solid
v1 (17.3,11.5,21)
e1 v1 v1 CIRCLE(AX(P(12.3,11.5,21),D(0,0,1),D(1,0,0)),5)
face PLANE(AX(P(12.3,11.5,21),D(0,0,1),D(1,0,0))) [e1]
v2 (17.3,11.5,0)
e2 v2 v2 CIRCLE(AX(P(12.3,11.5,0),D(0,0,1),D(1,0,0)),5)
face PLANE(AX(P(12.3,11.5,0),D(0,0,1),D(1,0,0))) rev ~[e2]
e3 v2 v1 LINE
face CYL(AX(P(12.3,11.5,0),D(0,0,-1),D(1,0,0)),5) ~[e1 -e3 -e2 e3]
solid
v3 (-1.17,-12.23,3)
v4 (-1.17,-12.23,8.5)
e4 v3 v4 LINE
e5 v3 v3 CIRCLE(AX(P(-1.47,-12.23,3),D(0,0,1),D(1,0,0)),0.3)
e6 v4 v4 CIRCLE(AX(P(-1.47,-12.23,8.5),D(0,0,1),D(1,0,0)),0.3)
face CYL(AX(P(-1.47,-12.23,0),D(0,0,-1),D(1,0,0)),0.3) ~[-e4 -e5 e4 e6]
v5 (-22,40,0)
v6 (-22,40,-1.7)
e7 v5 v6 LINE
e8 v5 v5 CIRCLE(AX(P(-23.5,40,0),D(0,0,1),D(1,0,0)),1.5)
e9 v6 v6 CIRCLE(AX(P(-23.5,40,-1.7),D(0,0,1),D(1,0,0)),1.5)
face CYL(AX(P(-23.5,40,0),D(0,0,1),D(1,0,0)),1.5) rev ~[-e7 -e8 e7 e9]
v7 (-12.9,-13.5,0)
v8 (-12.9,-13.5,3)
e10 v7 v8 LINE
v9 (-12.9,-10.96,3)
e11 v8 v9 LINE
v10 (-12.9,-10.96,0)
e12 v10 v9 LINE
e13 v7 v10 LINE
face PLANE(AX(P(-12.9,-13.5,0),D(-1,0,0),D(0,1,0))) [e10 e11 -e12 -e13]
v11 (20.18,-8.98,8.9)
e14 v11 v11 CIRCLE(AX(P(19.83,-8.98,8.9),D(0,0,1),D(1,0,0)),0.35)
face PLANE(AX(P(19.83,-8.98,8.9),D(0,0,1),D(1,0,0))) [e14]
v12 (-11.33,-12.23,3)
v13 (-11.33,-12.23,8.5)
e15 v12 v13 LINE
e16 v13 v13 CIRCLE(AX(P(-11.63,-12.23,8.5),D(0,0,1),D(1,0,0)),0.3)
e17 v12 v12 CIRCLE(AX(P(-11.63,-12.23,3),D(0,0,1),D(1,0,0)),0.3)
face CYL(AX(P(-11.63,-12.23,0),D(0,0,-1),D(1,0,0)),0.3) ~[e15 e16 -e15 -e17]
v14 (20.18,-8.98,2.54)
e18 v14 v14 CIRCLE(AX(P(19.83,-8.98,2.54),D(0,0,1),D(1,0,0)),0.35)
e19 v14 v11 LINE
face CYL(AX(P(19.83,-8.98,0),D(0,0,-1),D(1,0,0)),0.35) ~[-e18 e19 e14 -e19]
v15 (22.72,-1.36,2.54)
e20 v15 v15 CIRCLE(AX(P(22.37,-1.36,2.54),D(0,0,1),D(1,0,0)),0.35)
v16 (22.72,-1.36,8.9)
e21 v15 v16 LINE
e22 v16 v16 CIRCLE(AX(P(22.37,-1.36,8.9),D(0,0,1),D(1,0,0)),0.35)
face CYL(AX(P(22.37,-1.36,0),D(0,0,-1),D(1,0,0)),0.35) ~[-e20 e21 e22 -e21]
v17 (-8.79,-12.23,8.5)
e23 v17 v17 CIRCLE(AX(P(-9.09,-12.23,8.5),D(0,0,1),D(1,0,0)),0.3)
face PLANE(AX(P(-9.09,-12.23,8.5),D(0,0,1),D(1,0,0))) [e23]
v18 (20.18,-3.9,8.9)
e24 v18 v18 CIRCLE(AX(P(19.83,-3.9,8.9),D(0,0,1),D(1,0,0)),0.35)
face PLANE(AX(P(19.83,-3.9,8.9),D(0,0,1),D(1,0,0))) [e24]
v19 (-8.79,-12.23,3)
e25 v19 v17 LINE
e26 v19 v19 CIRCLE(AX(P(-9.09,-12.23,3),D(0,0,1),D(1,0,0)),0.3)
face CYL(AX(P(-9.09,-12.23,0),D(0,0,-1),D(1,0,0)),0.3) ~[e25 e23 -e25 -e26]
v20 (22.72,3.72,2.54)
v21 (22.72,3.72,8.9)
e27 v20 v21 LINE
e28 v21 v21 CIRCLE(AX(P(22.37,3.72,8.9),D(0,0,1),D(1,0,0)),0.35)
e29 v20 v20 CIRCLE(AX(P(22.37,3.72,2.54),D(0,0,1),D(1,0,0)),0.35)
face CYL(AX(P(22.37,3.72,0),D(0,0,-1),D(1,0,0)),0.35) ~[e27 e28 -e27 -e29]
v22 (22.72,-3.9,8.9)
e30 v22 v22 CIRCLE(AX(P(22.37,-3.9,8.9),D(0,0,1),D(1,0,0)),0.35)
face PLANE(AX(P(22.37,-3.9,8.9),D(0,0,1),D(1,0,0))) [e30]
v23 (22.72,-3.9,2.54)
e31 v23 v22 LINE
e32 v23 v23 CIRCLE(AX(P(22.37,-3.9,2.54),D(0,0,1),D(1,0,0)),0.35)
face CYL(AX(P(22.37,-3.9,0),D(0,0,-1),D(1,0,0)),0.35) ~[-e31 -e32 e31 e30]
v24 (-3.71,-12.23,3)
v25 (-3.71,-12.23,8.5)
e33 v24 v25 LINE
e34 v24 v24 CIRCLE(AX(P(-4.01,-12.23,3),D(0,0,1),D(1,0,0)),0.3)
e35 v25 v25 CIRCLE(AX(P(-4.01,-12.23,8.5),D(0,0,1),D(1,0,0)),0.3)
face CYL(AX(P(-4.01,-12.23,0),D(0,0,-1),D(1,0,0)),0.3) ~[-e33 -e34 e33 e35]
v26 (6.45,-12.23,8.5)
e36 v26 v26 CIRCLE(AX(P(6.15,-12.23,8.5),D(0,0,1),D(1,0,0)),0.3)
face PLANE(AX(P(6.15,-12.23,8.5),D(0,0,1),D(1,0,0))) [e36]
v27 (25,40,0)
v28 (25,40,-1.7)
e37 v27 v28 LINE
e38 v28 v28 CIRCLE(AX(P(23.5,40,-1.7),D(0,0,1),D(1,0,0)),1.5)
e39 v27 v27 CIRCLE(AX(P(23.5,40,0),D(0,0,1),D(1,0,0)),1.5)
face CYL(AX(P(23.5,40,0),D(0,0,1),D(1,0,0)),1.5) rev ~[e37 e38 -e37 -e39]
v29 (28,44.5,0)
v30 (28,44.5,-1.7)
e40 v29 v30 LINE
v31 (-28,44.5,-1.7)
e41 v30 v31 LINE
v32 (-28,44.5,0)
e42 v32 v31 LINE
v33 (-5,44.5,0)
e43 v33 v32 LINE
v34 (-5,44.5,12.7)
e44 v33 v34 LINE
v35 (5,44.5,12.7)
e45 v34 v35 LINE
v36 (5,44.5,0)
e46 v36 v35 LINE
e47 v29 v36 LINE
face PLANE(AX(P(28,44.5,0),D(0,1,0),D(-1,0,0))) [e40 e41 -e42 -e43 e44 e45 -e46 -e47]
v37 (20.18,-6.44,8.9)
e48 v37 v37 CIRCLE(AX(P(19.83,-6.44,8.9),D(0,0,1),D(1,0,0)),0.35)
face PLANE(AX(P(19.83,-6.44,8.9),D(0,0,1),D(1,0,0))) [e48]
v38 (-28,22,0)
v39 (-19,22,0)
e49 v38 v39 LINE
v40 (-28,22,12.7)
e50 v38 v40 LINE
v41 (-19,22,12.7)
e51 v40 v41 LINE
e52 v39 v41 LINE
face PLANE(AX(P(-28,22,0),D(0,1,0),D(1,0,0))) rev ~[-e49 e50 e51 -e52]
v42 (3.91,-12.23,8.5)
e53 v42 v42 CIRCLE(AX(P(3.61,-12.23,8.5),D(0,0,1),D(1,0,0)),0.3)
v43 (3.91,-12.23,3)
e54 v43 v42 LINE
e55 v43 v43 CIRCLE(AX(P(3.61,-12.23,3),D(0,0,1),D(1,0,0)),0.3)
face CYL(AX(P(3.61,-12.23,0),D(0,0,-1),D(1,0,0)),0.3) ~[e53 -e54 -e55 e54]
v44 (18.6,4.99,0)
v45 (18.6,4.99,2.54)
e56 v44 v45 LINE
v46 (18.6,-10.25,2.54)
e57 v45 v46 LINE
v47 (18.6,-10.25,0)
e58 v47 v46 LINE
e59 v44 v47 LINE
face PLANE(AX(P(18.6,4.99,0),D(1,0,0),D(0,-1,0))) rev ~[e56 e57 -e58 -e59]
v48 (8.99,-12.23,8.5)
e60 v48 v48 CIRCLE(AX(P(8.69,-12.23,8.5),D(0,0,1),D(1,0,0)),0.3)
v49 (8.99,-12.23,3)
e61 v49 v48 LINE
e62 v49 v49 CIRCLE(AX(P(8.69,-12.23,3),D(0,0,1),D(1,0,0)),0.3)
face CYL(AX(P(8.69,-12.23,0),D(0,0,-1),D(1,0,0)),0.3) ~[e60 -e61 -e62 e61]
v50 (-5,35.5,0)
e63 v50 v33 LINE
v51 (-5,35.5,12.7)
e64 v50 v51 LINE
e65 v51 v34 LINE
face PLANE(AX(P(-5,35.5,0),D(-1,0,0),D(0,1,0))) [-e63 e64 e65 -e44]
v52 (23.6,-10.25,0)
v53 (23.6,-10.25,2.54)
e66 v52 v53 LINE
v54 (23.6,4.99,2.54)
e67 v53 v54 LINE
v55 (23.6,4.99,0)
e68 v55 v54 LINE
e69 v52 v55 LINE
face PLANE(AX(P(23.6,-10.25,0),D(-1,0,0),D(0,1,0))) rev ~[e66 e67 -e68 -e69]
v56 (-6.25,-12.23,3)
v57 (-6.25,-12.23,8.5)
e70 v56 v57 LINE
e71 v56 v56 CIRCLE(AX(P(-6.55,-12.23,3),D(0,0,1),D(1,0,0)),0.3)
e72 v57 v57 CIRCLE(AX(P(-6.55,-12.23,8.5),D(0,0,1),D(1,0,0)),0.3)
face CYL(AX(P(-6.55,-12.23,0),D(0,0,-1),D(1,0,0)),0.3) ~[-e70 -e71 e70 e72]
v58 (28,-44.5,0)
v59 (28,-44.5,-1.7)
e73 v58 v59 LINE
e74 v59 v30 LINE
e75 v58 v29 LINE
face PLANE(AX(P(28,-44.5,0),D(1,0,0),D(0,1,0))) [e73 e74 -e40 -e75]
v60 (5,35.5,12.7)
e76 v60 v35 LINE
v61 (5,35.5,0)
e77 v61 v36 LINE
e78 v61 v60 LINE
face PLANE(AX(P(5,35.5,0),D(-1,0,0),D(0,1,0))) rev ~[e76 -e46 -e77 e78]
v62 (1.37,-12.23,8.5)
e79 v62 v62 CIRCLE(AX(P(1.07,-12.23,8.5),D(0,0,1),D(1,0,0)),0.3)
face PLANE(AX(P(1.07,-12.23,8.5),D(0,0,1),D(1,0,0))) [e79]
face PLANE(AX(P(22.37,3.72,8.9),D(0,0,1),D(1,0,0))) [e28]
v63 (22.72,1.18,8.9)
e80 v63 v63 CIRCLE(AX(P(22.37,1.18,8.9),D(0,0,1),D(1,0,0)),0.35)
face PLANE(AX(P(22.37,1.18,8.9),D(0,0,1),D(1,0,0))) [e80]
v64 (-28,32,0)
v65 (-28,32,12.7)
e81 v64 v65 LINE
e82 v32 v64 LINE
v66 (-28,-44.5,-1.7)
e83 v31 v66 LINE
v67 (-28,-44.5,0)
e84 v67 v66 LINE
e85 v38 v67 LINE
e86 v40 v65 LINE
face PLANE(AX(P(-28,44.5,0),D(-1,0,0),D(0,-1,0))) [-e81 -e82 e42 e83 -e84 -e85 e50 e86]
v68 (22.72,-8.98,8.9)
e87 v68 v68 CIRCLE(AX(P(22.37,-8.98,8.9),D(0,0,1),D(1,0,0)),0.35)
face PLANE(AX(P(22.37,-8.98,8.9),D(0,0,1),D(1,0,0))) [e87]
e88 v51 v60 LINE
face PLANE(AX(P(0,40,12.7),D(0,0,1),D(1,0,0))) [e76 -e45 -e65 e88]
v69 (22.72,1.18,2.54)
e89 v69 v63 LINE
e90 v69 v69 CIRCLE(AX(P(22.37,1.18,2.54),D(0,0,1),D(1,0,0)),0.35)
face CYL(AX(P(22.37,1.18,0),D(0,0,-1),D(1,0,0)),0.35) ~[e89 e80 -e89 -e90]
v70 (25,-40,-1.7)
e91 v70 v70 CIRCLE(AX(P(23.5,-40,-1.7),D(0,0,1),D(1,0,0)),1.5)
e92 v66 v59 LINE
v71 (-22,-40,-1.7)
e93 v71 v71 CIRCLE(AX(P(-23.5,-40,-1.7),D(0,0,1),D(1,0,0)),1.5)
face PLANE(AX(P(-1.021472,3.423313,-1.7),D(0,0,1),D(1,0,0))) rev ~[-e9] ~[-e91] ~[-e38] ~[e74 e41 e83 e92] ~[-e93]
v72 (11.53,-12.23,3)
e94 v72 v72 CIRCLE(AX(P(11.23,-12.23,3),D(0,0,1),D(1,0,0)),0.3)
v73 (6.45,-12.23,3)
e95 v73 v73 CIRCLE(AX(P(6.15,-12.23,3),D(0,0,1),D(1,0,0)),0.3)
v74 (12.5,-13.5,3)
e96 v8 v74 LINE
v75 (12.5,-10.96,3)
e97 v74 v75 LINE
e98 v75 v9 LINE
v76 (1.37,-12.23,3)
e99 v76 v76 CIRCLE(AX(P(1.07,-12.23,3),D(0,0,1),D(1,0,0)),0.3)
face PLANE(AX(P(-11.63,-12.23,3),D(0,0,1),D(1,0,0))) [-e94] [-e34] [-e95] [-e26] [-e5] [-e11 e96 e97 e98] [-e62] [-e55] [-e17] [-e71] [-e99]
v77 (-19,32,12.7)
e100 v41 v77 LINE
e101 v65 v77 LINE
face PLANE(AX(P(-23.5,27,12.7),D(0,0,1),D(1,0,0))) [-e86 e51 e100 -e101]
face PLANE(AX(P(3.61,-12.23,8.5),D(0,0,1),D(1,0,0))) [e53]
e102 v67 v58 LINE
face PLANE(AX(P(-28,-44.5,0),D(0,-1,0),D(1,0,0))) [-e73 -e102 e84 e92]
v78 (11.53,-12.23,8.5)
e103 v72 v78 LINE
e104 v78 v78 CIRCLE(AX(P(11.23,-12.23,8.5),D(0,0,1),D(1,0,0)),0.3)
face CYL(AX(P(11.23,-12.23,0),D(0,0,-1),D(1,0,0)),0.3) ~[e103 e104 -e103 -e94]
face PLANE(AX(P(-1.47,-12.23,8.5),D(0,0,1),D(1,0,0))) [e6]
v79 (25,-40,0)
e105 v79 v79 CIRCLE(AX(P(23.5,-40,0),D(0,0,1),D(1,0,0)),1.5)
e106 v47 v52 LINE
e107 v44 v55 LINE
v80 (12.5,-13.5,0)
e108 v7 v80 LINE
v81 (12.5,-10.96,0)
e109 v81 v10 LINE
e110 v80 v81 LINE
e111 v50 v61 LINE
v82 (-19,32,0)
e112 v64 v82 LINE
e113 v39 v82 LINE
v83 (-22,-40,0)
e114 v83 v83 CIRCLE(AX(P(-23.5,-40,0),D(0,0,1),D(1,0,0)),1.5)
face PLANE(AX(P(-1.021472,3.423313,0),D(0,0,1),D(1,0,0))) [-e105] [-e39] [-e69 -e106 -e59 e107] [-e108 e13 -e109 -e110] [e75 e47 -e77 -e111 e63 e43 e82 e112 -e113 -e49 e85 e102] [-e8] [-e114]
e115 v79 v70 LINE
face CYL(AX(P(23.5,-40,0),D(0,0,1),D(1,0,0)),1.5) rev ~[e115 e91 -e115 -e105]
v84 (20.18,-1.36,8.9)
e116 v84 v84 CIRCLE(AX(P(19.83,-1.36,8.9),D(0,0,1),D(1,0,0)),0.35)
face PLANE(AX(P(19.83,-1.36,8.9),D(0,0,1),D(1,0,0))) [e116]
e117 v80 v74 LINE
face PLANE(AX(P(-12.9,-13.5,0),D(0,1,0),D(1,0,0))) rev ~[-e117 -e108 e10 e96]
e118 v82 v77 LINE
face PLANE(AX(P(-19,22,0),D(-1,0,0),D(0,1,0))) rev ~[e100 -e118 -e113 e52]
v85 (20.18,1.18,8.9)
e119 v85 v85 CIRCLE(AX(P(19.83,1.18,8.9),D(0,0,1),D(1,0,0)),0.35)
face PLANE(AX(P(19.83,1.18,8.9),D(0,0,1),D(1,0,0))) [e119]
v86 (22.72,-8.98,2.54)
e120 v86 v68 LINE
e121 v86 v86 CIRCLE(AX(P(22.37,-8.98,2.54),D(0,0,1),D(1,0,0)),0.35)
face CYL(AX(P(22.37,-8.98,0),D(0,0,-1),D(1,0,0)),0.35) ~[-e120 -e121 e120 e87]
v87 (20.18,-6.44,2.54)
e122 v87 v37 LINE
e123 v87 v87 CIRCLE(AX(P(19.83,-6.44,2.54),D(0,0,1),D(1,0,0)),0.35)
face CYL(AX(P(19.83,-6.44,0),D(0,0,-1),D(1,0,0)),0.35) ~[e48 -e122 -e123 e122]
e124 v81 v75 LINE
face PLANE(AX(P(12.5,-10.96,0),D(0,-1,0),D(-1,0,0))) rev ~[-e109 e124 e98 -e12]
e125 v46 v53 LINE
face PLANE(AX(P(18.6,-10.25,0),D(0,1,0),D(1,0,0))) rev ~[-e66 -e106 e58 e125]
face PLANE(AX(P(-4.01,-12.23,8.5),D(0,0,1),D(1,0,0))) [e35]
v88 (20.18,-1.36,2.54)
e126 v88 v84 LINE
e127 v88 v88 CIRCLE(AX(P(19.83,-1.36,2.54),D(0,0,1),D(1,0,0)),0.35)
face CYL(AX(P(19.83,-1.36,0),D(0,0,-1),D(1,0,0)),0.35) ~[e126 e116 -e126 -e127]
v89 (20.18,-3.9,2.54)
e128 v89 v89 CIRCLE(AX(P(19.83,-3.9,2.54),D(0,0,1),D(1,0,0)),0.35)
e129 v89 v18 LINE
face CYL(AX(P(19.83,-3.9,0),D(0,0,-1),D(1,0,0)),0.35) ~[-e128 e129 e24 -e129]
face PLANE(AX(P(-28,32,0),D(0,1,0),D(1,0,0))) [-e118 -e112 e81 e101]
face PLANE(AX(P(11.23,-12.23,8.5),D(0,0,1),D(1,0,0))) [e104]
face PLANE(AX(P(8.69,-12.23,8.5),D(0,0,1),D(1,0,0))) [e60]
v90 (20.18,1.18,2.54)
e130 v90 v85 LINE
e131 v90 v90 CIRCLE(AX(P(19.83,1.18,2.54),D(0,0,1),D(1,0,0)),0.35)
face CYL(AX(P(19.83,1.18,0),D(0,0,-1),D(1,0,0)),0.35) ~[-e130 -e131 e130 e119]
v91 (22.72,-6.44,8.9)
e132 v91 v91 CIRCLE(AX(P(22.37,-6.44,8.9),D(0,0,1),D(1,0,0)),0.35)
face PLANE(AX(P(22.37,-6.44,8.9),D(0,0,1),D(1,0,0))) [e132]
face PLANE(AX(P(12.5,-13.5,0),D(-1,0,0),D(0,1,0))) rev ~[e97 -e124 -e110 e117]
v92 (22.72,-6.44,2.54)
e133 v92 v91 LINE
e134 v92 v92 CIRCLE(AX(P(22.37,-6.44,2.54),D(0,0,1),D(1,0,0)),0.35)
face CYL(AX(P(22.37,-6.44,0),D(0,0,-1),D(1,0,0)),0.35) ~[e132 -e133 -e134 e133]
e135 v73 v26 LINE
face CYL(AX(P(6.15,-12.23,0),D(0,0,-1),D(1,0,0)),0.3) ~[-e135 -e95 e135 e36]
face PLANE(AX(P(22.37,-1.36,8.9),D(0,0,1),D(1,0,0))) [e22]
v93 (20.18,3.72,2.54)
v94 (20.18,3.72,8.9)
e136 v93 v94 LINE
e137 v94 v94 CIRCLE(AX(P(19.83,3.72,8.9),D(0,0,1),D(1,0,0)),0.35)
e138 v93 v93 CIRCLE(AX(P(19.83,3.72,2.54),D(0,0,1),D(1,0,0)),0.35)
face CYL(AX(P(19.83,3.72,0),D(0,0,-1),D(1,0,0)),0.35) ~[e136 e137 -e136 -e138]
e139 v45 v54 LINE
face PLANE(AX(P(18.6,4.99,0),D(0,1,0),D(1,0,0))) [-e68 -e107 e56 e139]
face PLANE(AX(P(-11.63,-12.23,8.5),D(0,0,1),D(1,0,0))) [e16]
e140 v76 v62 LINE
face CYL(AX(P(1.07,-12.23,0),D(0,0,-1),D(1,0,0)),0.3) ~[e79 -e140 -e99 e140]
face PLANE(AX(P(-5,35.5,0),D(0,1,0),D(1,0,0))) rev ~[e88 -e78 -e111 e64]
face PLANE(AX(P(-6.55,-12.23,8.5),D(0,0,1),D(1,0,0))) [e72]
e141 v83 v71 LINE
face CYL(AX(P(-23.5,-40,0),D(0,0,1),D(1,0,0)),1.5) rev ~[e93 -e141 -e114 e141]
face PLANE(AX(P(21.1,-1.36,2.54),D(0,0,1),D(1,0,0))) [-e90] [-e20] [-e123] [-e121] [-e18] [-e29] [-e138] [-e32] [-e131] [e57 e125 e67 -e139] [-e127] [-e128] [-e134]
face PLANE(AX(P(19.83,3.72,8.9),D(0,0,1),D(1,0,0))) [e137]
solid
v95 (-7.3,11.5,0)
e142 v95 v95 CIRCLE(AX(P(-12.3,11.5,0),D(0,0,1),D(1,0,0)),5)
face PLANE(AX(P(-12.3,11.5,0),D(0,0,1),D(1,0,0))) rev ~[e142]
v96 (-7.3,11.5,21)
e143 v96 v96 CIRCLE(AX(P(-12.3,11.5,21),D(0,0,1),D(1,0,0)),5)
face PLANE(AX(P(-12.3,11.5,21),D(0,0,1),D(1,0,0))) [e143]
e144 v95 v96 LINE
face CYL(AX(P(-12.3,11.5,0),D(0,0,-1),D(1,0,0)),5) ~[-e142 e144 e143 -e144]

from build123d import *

# Parameters (mm, degrees)
F0_R     = 5
F1_DEPTH = 21
F0_R_2   = 1.5
F0_W     = 9
F0_H     = 10
F0_W_2   = 10
F0_H_2   = 9
F2_DEPTH = 1.7
F3_DEPTH = 12.7
F4_R     = 0.35
F5_DEPTH = 8.9
F4_W     = 5
F4_H     = 2.54
F6_DEPTH = 2.54
F4_R_2   = 0.3
F7_DEPTH = 8.5
F4_W_2   = 2.54
F8_DEPTH = 3


# Not quite as in the source:
# - a feature names something its author has since deleted; it is built from what else it names


with BuildPart() as f1:
    # F0 (on Top) → F1 (new body)
    with BuildSketch(Plane.XY):
        with Locations((12.3, 11.5)):
            Circle(F0_R)
    extrude(amount=F1_DEPTH)


with BuildPart() as f1b:
    # F0 (on Top) → F1, piece 2 (new body)
    with BuildSketch(Plane.XY):
        with Locations((-12.3, 11.5)):
            Circle(F0_R)
    extrude(amount=F1_DEPTH)


with BuildPart() as f2:
    # F0 (on Top) → F2 (new body)
    with BuildSketch(Plane.XY):
        Polygon((-28, -44.5), (28, -44.5), (28, 44.5), (5, 44.5), (5, 35.5), (-5, 35.5), (-5, 44.5), (-28, 44.5), (-28, 32), (-19, 32), (-19, 22), (-28, 22), align=None)
        with Locations((-23.5, -40)):
            Circle(F0_R_2, mode=Mode.SUBTRACT)
        with Locations((23.5, -40)):
            Circle(F0_R_2, mode=Mode.SUBTRACT)
        with Locations((-12.3, 11.5)):
            Circle(F0_R, mode=Mode.SUBTRACT)
        with Locations((-23.5, 40)):
            Circle(F0_R_2, mode=Mode.SUBTRACT)
        with Locations((12.3, 11.5)):
            Circle(F0_R, mode=Mode.SUBTRACT)
        with Locations((23.5, 40)):
            Circle(F0_R_2, mode=Mode.SUBTRACT)
        with Locations((-23.5, 27)):
            Rectangle(F0_W, F0_H)
        with Locations((0, 40)):
            Rectangle(F0_W_2, F0_H_2)
        with Locations((12.3, 11.5)):
            Circle(F0_R)
        with Locations((-12.3, 11.5)):
            Circle(F0_R)
    extrude(amount=-F2_DEPTH)

    # F0 (on Top) → F3 (join)
    with BuildSketch(Plane.XY):
        with Locations((0, 40)):
            Rectangle(F0_W_2, F0_H_2)
        with Locations((-23.5, 27)):
            Rectangle(F0_W, F0_H)
    extrude(amount=F3_DEPTH)

    # F4 (on face) → F5 (join)
    with BuildSketch(Plane.XY):
        with Locations((19.83, -6.44)):
            Circle(F4_R)
        with Locations((22.37, -6.44)):
            Circle(F4_R)
        with Locations((22.37, -8.98)):
            Circle(F4_R)
        with Locations((19.83, -8.98)):
            Circle(F4_R)
        with Locations((19.83, -3.9)):
            Circle(F4_R)
        with Locations((22.37, -3.9)):
            Circle(F4_R)
        with Locations((19.83, 1.18)):
            Circle(F4_R)
        with Locations((19.83, -1.36)):
            Circle(F4_R)
        with Locations((22.37, -1.36)):
            Circle(F4_R)
        with Locations((22.37, 1.18)):
            Circle(F4_R)
        with Locations((22.37, 3.72)):
            Circle(F4_R)
        with Locations((19.83, 3.72)):
            Circle(F4_R)
    extrude(amount=F5_DEPTH)

    # F4 (on face) → F6 (join)
    with BuildSketch(Plane.XY):
        with Locations((21.1, -1.36)):
            Rectangle(F4_W, F4_H)
        with Locations((19.83, -1.36)):
            Circle(F4_R, mode=Mode.SUBTRACT)
        with Locations((22.37, -1.36)):
            Circle(F4_R, mode=Mode.SUBTRACT)
        with Locations((21.1, -3.9)):
            Rectangle(F4_W, F4_H)
        with Locations((19.83, -3.9)):
            Circle(F4_R, mode=Mode.SUBTRACT)
        with Locations((22.37, -3.9)):
            Circle(F4_R, mode=Mode.SUBTRACT)
        with Locations((21.1, -6.44)):
            Rectangle(F4_W, F4_H)
        with Locations((19.83, -6.44)):
            Circle(F4_R, mode=Mode.SUBTRACT)
        with Locations((22.37, -6.44)):
            Circle(F4_R, mode=Mode.SUBTRACT)
        with Locations((21.1, 1.18)):
            Rectangle(F4_W, F4_H)
        with Locations((19.83, 1.18)):
            Circle(F4_R, mode=Mode.SUBTRACT)
        with Locations((22.37, 1.18)):
            Circle(F4_R, mode=Mode.SUBTRACT)
        with Locations((21.1, 3.72)):
            Rectangle(F4_W, F4_H)
        with Locations((19.83, 3.72)):
            Circle(F4_R, mode=Mode.SUBTRACT)
        with Locations((22.37, 3.72)):
            Circle(F4_R, mode=Mode.SUBTRACT)
        with Locations((21.1, -8.98)):
            Rectangle(F4_W, F4_H)
        with Locations((19.83, -8.98)):
            Circle(F4_R, mode=Mode.SUBTRACT)
        with Locations((22.37, -8.98)):
            Circle(F4_R, mode=Mode.SUBTRACT)
    extrude(amount=F6_DEPTH)

    # F4 (on face) → F7 (join)
    with BuildSketch(Plane.XY):
        with Locations((-11.63, -12.23)):
            Circle(F4_R_2)
        with Locations((-9.09, -12.23)):
            Circle(F4_R_2)
        with Locations((-6.55, -12.23)):
            Circle(F4_R_2)
        with Locations((-4.01, -12.23)):
            Circle(F4_R_2)
        with Locations((-1.47, -12.23)):
            Circle(F4_R_2)
        with Locations((1.07, -12.23)):
            Circle(F4_R_2)
        with Locations((3.61, -12.23)):
            Circle(F4_R_2)
        with Locations((6.15, -12.23)):
            Circle(F4_R_2)
        with Locations((8.69, -12.23)):
            Circle(F4_R_2)
        with Locations((11.23, -12.23)):
            Circle(F4_R_2)
    extrude(amount=F7_DEPTH)

    # F4 (on face) → F8 (join)
    with BuildSketch(Plane.XY):
        with Locations((-11.63, -12.23)):
            Rectangle(F4_W_2, F4_H)
        with Locations((-11.63, -12.23)):
            Circle(F4_R_2, mode=Mode.SUBTRACT)
        with Locations((-9.09, -12.23)):
            Rectangle(F4_W_2, F4_H)
        with Locations((-9.09, -12.23)):
            Circle(F4_R_2, mode=Mode.SUBTRACT)
        with Locations((-6.55, -12.23)):
            Rectangle(F4_W_2, F4_H)
        with Locations((-6.55, -12.23)):
            Circle(F4_R_2, mode=Mode.SUBTRACT)
        with Locations((-4.01, -12.23)):
            Rectangle(F4_W_2, F4_H)
        with Locations((-4.01, -12.23)):
            Circle(F4_R_2, mode=Mode.SUBTRACT)
        with Locations((-1.47, -12.23)):
            Rectangle(F4_W_2, F4_H)
        with Locations((-1.47, -12.23)):
            Circle(F4_R_2, mode=Mode.SUBTRACT)
        with Locations((1.07, -12.23)):
            Rectangle(F4_W_2, F4_H)
        with Locations((1.07, -12.23)):
            Circle(F4_R_2, mode=Mode.SUBTRACT)
        with Locations((3.61, -12.23)):
            Rectangle(F4_W_2, F4_H)
        with Locations((3.61, -12.23)):
            Circle(F4_R_2, mode=Mode.SUBTRACT)
        with Locations((6.15, -12.23)):
            Rectangle(F4_W_2, F4_H)
        with Locations((6.15, -12.23)):
            Circle(F4_R_2, mode=Mode.SUBTRACT)
        with Locations((8.69, -12.23)):
            Rectangle(F4_W_2, F4_H)
        with Locations((8.69, -12.23)):
            Circle(F4_R_2, mode=Mode.SUBTRACT)
        with Locations((11.23, -12.23)):
            Rectangle(F4_W_2, F4_H)
        with Locations((11.23, -12.23)):
            Circle(F4_R_2, mode=Mode.SUBTRACT)
    extrude(amount=F8_DEPTH)


solid = Compound([f1.part, f1b.part, f2.part])
